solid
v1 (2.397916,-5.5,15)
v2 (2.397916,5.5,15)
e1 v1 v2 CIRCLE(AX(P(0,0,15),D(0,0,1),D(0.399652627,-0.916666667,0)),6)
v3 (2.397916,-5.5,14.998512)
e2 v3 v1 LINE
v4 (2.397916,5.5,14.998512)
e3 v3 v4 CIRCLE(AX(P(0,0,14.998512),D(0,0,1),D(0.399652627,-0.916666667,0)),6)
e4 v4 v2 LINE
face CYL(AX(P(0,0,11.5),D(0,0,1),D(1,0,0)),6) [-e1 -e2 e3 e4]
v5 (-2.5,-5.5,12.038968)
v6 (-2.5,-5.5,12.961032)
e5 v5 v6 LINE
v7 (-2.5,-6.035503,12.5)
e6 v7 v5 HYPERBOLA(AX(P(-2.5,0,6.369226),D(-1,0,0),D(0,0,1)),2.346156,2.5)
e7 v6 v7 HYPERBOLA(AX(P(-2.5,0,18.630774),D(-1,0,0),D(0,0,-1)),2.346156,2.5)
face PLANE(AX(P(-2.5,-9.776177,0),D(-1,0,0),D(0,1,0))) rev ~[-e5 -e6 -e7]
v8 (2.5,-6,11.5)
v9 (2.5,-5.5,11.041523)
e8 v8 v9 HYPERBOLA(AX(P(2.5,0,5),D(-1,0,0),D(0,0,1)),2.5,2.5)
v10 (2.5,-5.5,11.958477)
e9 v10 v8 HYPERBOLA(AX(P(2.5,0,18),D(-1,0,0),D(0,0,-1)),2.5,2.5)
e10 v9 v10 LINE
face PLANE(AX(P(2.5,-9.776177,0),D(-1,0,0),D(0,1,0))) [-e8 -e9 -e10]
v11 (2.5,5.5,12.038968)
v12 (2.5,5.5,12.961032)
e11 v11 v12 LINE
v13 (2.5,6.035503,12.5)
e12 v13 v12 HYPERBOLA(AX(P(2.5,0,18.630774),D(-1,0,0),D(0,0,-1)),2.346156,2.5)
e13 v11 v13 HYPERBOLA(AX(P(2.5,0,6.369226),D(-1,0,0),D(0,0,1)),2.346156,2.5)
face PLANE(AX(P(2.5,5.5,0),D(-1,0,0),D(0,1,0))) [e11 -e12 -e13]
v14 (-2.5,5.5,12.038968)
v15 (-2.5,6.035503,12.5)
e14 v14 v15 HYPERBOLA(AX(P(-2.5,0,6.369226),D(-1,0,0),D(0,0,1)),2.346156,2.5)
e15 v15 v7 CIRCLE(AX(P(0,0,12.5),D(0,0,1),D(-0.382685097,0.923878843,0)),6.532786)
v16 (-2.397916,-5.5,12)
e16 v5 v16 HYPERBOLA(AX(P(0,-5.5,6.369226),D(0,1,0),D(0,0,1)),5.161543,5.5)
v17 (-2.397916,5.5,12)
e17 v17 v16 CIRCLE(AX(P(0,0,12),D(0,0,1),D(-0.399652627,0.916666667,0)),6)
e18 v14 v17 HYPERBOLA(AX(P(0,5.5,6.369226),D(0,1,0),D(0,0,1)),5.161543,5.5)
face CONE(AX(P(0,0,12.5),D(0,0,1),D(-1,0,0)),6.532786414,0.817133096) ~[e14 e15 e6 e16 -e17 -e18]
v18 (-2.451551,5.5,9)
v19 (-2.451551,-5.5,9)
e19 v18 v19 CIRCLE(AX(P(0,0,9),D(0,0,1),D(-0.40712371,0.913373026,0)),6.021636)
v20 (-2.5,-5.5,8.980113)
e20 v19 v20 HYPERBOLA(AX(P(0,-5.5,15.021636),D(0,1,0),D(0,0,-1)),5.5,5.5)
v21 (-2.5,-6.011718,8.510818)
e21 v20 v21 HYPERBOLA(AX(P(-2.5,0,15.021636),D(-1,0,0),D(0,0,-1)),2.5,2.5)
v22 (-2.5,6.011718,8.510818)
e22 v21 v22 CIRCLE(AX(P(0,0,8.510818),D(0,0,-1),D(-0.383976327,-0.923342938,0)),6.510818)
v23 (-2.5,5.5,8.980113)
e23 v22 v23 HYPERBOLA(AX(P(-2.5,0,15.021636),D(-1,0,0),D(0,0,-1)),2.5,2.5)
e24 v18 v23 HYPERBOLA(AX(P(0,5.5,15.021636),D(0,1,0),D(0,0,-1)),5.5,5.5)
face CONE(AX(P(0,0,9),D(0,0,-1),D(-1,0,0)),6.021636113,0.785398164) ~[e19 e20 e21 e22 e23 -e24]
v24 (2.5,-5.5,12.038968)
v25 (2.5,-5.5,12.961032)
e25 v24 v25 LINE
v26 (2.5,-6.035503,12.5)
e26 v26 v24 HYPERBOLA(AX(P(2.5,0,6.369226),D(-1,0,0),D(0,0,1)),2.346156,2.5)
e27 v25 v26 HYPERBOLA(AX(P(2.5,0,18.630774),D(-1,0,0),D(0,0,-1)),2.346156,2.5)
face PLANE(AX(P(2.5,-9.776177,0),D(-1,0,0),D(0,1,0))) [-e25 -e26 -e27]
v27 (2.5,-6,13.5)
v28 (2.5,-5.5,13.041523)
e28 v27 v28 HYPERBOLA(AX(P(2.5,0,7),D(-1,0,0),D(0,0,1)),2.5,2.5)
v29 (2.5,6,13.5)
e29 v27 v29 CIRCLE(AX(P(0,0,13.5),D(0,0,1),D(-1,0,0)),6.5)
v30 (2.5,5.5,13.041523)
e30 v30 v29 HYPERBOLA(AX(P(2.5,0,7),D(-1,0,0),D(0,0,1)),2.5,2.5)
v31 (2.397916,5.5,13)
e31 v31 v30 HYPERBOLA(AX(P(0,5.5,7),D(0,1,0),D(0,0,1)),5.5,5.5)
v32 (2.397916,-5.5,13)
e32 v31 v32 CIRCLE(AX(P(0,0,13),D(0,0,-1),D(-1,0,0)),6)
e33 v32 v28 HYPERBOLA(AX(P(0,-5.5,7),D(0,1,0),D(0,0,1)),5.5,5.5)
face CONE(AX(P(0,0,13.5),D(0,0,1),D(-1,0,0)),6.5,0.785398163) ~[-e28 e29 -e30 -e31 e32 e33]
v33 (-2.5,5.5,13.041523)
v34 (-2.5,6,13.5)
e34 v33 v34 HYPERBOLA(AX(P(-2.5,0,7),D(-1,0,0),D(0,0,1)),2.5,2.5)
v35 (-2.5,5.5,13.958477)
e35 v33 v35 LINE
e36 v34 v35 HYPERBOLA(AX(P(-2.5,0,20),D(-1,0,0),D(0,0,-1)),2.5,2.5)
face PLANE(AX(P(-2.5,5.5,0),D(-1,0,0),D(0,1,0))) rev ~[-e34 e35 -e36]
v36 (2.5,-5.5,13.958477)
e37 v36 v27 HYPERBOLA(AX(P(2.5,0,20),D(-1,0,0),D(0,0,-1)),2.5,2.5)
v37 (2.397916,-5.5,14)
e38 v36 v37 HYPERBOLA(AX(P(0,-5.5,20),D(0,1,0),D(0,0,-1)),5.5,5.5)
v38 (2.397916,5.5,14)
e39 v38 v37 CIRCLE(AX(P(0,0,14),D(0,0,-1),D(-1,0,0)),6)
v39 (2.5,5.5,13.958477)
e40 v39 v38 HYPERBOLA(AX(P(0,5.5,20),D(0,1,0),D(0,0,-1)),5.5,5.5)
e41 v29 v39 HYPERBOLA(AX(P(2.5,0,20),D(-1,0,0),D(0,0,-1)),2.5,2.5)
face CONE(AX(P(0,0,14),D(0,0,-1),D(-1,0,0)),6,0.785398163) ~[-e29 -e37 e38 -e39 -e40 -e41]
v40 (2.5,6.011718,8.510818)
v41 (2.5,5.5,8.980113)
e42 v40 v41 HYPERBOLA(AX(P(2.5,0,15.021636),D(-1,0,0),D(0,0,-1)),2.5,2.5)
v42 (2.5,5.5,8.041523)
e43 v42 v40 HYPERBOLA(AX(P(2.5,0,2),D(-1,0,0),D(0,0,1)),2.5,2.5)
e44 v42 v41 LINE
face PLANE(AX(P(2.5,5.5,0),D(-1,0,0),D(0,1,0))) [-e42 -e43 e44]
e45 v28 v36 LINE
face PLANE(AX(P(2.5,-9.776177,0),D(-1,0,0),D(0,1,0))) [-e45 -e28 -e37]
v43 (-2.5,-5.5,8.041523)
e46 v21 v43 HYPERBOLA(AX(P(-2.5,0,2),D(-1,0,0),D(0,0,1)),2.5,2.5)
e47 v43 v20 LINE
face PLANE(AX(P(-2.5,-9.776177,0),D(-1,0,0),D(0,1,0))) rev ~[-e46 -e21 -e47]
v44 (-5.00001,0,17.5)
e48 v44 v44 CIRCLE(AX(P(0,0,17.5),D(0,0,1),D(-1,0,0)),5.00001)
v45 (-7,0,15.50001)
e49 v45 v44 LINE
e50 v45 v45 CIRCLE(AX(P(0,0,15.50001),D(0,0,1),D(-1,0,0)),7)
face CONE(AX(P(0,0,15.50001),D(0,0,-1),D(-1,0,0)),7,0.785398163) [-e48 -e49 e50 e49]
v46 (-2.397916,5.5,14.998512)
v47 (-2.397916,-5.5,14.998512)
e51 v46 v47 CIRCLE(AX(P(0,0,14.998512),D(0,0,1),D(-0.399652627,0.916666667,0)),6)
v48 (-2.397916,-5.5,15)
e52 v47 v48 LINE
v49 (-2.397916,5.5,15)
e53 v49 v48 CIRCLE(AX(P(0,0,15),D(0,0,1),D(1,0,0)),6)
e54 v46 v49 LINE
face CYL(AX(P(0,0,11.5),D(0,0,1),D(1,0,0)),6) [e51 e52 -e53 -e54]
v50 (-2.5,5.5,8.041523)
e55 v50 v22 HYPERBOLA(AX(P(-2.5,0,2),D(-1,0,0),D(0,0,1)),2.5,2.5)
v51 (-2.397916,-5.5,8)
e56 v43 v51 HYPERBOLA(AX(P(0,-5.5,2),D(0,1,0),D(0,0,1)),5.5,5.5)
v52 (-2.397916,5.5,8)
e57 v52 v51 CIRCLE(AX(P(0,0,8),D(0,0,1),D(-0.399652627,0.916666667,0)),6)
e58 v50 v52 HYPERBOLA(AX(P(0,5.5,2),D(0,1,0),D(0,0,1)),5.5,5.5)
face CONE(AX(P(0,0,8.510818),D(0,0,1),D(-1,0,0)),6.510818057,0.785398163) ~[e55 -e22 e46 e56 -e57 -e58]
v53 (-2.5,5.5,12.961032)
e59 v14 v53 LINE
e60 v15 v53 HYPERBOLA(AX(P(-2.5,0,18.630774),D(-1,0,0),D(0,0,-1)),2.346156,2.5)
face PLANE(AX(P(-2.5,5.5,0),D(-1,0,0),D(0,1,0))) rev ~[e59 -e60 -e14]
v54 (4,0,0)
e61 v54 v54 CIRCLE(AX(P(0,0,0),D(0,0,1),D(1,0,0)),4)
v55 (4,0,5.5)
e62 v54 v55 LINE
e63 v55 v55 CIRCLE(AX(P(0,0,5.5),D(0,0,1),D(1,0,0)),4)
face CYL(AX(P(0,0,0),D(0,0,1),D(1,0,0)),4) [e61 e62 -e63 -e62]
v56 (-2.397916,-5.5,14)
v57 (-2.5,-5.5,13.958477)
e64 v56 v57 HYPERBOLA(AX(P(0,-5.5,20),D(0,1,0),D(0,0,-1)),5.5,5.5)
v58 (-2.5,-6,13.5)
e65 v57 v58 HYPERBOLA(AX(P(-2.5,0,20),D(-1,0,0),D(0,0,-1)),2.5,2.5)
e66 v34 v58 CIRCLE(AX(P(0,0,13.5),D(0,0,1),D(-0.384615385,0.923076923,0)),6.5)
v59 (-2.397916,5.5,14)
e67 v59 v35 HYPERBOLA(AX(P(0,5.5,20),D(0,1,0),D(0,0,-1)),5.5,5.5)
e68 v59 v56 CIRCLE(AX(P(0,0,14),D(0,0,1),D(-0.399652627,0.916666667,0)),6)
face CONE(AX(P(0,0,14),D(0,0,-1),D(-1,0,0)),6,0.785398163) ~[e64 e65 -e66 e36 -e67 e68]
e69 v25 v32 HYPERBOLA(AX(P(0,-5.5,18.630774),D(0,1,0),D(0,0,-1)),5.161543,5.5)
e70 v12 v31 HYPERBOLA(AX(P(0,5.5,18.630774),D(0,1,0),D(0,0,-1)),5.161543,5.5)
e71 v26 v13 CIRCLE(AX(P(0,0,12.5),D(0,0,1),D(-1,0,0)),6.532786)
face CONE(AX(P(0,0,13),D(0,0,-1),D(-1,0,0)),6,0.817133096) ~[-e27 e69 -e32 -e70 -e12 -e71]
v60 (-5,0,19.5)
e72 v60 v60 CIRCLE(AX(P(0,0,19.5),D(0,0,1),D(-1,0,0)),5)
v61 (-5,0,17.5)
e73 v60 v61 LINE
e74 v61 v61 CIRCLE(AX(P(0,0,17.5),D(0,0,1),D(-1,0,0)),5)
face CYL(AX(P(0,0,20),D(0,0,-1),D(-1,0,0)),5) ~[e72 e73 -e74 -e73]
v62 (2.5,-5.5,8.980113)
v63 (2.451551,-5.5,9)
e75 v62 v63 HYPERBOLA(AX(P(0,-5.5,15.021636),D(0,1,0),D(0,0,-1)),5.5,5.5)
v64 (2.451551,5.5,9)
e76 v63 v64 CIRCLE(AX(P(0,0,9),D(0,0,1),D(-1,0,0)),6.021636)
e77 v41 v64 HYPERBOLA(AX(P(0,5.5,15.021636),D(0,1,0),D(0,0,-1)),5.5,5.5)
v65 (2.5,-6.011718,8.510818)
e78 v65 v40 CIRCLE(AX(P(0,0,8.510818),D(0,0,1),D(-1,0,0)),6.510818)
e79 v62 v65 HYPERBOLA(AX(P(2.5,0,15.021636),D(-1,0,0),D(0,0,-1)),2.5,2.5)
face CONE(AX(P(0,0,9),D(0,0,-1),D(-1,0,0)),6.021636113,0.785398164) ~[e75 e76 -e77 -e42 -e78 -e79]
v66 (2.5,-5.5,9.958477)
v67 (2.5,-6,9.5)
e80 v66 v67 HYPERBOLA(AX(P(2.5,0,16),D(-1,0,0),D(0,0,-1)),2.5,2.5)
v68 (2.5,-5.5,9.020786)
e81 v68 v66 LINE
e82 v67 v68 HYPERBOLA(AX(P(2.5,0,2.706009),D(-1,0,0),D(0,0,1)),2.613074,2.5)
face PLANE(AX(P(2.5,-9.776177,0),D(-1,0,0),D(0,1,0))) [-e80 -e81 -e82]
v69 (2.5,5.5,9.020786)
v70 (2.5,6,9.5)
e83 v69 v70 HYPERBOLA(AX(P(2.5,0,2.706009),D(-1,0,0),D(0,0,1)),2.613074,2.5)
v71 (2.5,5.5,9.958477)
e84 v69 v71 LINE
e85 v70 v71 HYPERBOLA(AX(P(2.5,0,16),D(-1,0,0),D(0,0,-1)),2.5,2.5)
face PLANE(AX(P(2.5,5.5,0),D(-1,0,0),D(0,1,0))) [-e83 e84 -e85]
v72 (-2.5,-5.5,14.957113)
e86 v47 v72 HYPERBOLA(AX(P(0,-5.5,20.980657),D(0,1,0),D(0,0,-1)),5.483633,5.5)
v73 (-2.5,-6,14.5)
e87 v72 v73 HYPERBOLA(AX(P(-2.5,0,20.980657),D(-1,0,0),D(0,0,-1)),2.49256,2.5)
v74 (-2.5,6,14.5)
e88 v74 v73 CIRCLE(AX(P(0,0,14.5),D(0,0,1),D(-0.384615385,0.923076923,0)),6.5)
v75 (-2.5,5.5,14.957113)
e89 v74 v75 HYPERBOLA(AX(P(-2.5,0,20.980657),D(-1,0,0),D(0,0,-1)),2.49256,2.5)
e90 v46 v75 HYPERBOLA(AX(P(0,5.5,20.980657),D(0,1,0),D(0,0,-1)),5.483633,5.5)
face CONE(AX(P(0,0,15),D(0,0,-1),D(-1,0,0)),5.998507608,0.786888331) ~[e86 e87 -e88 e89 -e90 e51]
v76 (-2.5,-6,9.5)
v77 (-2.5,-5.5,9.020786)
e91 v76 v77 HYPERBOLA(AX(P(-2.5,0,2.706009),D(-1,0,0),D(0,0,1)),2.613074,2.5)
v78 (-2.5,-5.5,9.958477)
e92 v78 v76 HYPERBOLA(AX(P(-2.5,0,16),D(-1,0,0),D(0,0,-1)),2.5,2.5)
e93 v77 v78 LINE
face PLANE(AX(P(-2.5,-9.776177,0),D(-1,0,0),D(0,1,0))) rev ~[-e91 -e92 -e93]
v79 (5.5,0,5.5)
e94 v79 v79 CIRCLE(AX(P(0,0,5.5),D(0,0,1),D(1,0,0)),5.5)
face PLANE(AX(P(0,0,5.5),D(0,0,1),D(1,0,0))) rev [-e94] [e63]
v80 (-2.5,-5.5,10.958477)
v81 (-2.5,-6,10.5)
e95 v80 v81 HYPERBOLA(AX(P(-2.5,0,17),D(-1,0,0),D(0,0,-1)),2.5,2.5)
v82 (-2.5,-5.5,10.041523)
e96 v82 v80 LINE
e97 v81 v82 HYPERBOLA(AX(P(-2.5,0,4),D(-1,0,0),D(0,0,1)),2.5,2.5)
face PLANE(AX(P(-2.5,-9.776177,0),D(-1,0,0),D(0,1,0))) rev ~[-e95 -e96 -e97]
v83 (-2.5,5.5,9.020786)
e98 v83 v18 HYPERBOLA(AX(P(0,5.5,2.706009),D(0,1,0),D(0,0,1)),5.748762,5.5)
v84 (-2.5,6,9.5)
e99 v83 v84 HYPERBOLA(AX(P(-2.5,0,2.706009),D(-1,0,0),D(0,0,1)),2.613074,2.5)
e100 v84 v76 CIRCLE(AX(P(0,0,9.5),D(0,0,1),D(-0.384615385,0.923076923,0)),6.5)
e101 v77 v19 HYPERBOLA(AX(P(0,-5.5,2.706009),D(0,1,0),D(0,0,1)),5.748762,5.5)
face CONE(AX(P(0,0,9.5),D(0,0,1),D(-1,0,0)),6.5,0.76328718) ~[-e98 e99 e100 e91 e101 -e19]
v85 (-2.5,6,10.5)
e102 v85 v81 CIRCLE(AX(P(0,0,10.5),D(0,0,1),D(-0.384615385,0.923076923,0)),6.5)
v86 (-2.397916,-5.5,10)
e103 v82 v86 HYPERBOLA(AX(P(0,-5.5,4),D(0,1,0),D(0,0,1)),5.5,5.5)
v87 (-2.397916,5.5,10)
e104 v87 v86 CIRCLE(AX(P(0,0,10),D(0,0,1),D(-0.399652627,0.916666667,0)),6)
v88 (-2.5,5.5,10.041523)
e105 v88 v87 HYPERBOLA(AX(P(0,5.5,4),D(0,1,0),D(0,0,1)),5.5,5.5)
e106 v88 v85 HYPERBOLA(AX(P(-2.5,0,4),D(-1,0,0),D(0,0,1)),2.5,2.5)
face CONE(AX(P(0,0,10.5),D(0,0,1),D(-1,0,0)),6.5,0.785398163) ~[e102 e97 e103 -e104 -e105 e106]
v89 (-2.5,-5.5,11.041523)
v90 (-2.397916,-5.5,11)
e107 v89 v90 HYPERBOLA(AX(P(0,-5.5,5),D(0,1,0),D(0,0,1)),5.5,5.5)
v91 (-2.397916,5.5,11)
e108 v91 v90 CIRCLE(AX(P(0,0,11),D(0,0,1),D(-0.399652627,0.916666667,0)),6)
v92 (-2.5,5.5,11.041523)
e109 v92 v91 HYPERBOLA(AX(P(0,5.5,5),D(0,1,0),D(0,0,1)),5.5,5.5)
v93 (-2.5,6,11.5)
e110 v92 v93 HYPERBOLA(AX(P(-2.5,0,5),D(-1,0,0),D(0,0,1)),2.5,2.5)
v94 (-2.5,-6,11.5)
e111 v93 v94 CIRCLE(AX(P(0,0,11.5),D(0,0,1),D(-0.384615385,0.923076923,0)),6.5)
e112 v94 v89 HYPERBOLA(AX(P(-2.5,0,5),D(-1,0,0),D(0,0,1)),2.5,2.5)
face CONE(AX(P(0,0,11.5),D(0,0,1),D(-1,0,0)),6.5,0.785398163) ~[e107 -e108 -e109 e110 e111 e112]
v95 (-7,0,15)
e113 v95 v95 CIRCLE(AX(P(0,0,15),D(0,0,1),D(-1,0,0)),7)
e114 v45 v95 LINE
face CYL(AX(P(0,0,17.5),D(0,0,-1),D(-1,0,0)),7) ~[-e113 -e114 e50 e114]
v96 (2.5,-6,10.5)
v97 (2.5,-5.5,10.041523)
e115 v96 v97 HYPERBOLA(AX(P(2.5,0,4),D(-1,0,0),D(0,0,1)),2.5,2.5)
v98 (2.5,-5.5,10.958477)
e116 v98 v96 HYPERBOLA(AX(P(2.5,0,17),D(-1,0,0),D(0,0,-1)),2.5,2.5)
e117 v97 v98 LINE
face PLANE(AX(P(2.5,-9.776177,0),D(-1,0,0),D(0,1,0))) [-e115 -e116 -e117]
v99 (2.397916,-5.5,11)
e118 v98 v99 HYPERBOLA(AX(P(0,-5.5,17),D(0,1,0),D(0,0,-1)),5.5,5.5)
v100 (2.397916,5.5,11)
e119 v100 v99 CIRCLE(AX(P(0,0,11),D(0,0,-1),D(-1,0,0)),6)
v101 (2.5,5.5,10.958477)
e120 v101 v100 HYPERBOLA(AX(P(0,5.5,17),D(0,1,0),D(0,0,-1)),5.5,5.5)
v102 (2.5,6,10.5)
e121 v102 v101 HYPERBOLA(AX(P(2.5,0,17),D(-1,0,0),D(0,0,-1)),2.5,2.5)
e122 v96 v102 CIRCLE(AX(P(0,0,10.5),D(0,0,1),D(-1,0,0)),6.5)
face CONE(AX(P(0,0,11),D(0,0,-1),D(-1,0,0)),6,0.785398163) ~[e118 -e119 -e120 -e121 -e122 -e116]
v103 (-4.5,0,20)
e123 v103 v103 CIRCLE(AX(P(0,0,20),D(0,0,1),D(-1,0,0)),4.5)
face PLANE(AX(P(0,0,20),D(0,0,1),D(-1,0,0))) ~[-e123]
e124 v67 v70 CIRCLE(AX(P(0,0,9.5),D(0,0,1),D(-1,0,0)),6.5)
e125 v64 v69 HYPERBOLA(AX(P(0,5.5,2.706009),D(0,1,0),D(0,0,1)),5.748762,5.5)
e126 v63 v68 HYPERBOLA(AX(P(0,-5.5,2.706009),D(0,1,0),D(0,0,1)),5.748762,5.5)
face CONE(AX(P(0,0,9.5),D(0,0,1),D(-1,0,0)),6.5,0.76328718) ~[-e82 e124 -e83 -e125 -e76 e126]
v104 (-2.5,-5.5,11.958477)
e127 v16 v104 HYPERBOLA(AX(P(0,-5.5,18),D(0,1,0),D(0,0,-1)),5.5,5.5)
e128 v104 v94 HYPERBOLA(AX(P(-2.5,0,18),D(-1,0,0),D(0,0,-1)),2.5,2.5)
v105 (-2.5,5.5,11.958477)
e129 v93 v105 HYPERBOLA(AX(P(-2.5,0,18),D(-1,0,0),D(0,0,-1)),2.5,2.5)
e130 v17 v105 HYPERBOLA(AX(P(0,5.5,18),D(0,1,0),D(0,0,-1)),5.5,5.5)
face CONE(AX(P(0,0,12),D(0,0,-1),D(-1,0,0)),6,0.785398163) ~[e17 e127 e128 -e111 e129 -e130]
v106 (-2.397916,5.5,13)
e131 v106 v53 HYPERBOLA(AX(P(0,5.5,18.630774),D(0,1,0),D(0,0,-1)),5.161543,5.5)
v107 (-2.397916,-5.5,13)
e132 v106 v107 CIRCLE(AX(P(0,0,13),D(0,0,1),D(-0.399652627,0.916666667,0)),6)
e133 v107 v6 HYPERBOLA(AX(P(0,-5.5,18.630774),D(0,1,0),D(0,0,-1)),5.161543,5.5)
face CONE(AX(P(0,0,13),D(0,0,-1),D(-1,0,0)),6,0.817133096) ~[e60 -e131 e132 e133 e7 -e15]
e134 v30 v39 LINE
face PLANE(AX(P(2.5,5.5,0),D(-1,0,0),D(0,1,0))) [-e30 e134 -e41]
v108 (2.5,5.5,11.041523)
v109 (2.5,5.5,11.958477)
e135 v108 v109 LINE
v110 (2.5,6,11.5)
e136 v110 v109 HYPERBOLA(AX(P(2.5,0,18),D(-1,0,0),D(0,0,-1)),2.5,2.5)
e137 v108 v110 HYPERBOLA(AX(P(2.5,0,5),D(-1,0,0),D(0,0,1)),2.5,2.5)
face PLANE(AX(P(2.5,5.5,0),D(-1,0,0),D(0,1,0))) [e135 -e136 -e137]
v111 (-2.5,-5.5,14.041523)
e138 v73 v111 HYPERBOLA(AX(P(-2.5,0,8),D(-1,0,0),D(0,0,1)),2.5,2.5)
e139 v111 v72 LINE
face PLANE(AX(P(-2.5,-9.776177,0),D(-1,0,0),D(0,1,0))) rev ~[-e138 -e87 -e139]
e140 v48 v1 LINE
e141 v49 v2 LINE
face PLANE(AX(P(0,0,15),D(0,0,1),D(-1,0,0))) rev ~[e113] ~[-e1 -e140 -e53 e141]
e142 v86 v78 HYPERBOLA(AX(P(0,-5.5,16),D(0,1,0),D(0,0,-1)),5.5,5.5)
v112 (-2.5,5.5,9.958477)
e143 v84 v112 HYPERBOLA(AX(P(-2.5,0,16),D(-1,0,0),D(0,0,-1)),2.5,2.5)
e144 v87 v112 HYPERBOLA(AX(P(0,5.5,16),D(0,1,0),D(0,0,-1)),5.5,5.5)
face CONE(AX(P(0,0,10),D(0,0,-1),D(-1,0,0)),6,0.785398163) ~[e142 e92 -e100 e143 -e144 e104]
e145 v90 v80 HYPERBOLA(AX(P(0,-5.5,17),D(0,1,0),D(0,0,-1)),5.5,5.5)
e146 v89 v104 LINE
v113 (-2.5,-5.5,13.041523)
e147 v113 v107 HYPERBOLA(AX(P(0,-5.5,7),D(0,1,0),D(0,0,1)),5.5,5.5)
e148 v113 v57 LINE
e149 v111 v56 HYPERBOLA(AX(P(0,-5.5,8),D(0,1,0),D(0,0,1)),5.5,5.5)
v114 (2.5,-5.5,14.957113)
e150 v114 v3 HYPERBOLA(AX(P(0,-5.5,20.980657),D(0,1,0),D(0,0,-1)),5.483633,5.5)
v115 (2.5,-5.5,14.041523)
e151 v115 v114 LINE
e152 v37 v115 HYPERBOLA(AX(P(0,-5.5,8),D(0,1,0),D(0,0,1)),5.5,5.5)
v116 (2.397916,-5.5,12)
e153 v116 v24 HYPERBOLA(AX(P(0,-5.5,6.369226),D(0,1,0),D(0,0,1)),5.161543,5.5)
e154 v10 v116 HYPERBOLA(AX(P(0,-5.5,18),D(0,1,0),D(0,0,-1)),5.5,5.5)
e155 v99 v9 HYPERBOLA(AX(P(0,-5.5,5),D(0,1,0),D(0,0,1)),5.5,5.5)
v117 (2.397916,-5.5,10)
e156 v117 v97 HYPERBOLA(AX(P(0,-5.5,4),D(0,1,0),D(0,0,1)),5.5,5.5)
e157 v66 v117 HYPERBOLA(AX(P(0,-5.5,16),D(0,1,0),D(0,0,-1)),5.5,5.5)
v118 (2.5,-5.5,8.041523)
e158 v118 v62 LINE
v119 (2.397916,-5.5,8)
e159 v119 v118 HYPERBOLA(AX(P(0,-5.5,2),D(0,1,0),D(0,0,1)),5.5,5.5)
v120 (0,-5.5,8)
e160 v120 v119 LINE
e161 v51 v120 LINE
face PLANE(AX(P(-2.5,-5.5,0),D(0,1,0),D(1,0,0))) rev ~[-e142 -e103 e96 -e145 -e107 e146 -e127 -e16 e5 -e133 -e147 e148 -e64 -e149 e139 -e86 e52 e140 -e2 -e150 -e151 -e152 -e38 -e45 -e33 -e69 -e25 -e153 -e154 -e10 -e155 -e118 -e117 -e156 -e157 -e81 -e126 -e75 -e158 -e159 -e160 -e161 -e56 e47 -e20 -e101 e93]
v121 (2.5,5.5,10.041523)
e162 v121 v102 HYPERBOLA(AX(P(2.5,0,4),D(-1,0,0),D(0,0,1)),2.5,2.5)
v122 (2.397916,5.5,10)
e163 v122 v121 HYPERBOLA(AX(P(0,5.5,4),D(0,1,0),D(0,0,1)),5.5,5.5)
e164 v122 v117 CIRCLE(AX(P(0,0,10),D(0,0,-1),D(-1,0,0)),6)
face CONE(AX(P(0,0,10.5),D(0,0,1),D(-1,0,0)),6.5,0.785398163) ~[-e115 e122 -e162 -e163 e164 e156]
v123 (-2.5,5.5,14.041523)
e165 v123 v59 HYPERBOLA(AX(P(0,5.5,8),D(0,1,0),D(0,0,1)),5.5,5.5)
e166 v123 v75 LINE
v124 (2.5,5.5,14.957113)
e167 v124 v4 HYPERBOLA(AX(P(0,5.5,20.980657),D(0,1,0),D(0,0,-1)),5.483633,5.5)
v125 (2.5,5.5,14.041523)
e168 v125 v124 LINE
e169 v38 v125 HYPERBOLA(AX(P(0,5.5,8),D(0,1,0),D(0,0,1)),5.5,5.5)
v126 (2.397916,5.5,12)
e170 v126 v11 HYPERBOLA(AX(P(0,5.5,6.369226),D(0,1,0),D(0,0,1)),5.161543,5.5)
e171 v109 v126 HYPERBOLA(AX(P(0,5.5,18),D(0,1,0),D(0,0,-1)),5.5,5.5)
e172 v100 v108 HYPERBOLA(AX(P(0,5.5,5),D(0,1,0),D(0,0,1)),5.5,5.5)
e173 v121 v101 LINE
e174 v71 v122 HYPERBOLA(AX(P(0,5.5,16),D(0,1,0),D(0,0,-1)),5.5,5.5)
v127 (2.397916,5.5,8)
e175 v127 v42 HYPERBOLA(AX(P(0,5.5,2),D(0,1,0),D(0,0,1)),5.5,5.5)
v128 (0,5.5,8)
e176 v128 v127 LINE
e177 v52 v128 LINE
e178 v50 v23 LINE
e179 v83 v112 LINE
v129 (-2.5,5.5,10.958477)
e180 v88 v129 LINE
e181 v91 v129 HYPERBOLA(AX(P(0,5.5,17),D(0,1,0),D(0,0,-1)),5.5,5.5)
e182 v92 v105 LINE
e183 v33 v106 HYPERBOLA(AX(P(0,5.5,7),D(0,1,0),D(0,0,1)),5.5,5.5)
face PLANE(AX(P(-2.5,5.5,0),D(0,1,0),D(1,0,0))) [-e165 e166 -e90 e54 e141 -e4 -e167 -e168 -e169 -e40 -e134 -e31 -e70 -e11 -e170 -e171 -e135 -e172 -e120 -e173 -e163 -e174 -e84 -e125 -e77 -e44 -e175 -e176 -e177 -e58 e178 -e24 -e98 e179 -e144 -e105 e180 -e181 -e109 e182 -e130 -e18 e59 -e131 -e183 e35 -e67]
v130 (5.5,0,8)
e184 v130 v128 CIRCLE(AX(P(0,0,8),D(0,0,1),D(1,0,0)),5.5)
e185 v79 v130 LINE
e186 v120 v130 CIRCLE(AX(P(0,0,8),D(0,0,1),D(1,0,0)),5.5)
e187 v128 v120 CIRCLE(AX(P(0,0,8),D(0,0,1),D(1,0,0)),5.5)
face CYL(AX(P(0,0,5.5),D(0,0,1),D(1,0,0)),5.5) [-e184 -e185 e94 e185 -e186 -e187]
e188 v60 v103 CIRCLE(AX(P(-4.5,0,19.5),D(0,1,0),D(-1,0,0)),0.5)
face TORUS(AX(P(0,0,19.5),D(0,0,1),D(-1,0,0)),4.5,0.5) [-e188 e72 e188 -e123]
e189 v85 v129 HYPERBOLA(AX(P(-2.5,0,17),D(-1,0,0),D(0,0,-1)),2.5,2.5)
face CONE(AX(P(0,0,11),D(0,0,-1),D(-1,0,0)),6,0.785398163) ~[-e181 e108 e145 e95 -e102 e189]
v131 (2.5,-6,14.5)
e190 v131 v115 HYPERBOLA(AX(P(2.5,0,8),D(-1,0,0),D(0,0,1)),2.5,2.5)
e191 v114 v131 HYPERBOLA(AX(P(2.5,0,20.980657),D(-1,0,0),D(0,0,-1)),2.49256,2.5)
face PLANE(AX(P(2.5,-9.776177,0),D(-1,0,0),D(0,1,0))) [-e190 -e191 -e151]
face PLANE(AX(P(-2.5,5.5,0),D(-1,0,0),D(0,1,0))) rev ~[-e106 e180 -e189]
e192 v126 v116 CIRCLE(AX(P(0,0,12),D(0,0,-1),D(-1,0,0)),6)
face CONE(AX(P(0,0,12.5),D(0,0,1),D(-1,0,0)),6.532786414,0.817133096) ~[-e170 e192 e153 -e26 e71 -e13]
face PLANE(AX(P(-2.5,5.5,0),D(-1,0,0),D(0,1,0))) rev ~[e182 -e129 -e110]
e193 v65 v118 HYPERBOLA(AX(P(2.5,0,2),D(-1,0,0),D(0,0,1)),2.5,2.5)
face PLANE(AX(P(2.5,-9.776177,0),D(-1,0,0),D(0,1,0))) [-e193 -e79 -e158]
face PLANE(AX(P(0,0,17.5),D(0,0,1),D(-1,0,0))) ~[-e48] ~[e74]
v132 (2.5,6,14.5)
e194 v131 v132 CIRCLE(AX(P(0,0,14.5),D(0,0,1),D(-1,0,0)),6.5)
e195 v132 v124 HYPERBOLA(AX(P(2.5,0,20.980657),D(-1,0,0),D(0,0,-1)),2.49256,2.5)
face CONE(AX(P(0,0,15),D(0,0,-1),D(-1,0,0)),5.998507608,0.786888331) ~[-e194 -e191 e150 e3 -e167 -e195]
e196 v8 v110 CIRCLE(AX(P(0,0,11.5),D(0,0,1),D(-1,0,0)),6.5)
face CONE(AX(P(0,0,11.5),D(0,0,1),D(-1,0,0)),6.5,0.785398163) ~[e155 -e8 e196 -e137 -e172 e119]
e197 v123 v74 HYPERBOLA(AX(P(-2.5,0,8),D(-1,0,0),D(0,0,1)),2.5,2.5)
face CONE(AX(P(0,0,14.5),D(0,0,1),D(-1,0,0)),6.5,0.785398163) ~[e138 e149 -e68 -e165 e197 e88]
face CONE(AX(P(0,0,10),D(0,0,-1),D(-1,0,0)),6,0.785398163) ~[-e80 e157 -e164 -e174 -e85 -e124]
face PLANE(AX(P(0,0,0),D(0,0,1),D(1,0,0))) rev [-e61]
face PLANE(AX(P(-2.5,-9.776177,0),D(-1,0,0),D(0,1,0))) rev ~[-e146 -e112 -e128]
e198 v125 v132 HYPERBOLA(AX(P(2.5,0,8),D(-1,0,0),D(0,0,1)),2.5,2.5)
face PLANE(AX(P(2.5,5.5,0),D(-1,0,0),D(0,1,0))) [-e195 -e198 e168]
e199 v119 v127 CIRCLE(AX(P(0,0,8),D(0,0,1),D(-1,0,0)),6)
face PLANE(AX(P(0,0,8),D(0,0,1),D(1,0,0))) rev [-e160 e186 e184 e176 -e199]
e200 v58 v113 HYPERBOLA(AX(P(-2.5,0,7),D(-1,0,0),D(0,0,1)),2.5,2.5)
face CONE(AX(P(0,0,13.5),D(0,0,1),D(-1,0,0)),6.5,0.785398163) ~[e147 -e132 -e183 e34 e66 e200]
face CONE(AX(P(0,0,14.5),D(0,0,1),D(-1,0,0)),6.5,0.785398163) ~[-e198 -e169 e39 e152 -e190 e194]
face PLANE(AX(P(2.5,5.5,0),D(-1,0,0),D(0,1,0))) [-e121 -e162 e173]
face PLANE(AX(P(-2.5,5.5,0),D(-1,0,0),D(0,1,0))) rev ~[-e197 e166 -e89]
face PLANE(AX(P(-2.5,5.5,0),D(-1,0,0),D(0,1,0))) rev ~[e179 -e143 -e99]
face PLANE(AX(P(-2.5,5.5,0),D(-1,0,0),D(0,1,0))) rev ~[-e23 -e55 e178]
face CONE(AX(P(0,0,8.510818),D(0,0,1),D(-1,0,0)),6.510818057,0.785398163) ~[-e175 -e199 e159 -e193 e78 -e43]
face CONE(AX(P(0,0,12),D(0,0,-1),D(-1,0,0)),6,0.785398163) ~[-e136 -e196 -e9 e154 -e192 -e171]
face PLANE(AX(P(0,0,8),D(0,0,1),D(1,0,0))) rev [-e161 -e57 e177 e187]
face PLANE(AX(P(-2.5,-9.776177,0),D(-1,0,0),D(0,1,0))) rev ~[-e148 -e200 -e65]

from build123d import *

# Parameters (mm, degrees)
F2_W      = 6
F2_H      = 7
F10_SIZE2 = 1.99999
F10_SIZE  = 1.99999
F11_R     = 0.5
F12_W     = 5
F12_H     = 3.4022161548
F12_H_2   = 4.2761773802
F13_DEPTH = 15


# Not quite as in the source:
# - a fillet or chamfer is up to 0.001 mm smaller than in the source, because OpenCascade refuses the exact size


with BuildPart() as f1:
    # F0 (on Front) → F1 (revolve)
    with BuildSketch(Plane.XZ):
        Polygon((0, 8), (0, 0), (4, 0), (4, 5.5), (5.5, 5.5), (5.5, 8), align=None)
    revolve(axis=Axis((0, 0, 8.8947357469), (0, 0, 1)))

    # F2 (on Front) → F3 (revolve)
    with BuildSketch(Plane.XZ):
        with Locations((3, 11.5)):
            Rectangle(F2_W, F2_H)
    revolve(axis=Axis((0, 0, 12.8918935508), (0, 0, 1)))

    # F6 (on Front) → F7 (revolve)
    with BuildSketch(Plane.XZ):
        Polygon((-6.5108180568, 8.5108180568), (-6, 8), (0, 8), (0, 15), (-5.9985076077, 15), (-6.5, 14.5), (-6, 14), (-6.5, 13.5), (-6, 13), (-6.532786414, 12.5), (-6, 12), (-6.5, 11.5), (-6, 11), (-6.5, 10.5), (-6, 10), (-6.5, 9.5), (-6.0216361135, 9), align=None)
    revolve(axis=Axis((0, 0, 9.6160949171), (0, 0, 1)))

    # F8 (on Front) → F9 (revolve)
    with BuildSketch(Plane.XZ):
        Polygon((-7, 15), (0, 15), (0, 20), (-5, 20), (-5, 17.5), (-7, 17.5), align=None)
    revolve(axis=Axis((0, 0, 18.9704594016), (0, 0, 1)))

    # F10 (size 2 and 2 in the source; OpenCascade refuses exactly that, so slightly less here)
    f10_edges = [f1.edges().sort_by_distance(p)[0] for p in [
        (7, 0, 17.5),
    ]]
    chamfer(f10_edges, length=F10_SIZE, length2=F10_SIZE2)

    # F11
    f11_edges = [f1.edges().sort_by_distance(p)[0] for p in [
        (5, 0, 20),
    ]]
    fillet(f11_edges, radius=F11_R)

    # F12 (on Top) → F13 (cut, through all)
    with BuildSketch(Plane.XY):
        with Locations((0, 7.2011080774)):
            Rectangle(F12_W, F12_H)
        with Locations((0, -7.6380886901)):
            Rectangle(F12_W, F12_H_2)
    extrude(amount=F13_DEPTH, mode=Mode.SUBTRACT)


solid = f1.part
